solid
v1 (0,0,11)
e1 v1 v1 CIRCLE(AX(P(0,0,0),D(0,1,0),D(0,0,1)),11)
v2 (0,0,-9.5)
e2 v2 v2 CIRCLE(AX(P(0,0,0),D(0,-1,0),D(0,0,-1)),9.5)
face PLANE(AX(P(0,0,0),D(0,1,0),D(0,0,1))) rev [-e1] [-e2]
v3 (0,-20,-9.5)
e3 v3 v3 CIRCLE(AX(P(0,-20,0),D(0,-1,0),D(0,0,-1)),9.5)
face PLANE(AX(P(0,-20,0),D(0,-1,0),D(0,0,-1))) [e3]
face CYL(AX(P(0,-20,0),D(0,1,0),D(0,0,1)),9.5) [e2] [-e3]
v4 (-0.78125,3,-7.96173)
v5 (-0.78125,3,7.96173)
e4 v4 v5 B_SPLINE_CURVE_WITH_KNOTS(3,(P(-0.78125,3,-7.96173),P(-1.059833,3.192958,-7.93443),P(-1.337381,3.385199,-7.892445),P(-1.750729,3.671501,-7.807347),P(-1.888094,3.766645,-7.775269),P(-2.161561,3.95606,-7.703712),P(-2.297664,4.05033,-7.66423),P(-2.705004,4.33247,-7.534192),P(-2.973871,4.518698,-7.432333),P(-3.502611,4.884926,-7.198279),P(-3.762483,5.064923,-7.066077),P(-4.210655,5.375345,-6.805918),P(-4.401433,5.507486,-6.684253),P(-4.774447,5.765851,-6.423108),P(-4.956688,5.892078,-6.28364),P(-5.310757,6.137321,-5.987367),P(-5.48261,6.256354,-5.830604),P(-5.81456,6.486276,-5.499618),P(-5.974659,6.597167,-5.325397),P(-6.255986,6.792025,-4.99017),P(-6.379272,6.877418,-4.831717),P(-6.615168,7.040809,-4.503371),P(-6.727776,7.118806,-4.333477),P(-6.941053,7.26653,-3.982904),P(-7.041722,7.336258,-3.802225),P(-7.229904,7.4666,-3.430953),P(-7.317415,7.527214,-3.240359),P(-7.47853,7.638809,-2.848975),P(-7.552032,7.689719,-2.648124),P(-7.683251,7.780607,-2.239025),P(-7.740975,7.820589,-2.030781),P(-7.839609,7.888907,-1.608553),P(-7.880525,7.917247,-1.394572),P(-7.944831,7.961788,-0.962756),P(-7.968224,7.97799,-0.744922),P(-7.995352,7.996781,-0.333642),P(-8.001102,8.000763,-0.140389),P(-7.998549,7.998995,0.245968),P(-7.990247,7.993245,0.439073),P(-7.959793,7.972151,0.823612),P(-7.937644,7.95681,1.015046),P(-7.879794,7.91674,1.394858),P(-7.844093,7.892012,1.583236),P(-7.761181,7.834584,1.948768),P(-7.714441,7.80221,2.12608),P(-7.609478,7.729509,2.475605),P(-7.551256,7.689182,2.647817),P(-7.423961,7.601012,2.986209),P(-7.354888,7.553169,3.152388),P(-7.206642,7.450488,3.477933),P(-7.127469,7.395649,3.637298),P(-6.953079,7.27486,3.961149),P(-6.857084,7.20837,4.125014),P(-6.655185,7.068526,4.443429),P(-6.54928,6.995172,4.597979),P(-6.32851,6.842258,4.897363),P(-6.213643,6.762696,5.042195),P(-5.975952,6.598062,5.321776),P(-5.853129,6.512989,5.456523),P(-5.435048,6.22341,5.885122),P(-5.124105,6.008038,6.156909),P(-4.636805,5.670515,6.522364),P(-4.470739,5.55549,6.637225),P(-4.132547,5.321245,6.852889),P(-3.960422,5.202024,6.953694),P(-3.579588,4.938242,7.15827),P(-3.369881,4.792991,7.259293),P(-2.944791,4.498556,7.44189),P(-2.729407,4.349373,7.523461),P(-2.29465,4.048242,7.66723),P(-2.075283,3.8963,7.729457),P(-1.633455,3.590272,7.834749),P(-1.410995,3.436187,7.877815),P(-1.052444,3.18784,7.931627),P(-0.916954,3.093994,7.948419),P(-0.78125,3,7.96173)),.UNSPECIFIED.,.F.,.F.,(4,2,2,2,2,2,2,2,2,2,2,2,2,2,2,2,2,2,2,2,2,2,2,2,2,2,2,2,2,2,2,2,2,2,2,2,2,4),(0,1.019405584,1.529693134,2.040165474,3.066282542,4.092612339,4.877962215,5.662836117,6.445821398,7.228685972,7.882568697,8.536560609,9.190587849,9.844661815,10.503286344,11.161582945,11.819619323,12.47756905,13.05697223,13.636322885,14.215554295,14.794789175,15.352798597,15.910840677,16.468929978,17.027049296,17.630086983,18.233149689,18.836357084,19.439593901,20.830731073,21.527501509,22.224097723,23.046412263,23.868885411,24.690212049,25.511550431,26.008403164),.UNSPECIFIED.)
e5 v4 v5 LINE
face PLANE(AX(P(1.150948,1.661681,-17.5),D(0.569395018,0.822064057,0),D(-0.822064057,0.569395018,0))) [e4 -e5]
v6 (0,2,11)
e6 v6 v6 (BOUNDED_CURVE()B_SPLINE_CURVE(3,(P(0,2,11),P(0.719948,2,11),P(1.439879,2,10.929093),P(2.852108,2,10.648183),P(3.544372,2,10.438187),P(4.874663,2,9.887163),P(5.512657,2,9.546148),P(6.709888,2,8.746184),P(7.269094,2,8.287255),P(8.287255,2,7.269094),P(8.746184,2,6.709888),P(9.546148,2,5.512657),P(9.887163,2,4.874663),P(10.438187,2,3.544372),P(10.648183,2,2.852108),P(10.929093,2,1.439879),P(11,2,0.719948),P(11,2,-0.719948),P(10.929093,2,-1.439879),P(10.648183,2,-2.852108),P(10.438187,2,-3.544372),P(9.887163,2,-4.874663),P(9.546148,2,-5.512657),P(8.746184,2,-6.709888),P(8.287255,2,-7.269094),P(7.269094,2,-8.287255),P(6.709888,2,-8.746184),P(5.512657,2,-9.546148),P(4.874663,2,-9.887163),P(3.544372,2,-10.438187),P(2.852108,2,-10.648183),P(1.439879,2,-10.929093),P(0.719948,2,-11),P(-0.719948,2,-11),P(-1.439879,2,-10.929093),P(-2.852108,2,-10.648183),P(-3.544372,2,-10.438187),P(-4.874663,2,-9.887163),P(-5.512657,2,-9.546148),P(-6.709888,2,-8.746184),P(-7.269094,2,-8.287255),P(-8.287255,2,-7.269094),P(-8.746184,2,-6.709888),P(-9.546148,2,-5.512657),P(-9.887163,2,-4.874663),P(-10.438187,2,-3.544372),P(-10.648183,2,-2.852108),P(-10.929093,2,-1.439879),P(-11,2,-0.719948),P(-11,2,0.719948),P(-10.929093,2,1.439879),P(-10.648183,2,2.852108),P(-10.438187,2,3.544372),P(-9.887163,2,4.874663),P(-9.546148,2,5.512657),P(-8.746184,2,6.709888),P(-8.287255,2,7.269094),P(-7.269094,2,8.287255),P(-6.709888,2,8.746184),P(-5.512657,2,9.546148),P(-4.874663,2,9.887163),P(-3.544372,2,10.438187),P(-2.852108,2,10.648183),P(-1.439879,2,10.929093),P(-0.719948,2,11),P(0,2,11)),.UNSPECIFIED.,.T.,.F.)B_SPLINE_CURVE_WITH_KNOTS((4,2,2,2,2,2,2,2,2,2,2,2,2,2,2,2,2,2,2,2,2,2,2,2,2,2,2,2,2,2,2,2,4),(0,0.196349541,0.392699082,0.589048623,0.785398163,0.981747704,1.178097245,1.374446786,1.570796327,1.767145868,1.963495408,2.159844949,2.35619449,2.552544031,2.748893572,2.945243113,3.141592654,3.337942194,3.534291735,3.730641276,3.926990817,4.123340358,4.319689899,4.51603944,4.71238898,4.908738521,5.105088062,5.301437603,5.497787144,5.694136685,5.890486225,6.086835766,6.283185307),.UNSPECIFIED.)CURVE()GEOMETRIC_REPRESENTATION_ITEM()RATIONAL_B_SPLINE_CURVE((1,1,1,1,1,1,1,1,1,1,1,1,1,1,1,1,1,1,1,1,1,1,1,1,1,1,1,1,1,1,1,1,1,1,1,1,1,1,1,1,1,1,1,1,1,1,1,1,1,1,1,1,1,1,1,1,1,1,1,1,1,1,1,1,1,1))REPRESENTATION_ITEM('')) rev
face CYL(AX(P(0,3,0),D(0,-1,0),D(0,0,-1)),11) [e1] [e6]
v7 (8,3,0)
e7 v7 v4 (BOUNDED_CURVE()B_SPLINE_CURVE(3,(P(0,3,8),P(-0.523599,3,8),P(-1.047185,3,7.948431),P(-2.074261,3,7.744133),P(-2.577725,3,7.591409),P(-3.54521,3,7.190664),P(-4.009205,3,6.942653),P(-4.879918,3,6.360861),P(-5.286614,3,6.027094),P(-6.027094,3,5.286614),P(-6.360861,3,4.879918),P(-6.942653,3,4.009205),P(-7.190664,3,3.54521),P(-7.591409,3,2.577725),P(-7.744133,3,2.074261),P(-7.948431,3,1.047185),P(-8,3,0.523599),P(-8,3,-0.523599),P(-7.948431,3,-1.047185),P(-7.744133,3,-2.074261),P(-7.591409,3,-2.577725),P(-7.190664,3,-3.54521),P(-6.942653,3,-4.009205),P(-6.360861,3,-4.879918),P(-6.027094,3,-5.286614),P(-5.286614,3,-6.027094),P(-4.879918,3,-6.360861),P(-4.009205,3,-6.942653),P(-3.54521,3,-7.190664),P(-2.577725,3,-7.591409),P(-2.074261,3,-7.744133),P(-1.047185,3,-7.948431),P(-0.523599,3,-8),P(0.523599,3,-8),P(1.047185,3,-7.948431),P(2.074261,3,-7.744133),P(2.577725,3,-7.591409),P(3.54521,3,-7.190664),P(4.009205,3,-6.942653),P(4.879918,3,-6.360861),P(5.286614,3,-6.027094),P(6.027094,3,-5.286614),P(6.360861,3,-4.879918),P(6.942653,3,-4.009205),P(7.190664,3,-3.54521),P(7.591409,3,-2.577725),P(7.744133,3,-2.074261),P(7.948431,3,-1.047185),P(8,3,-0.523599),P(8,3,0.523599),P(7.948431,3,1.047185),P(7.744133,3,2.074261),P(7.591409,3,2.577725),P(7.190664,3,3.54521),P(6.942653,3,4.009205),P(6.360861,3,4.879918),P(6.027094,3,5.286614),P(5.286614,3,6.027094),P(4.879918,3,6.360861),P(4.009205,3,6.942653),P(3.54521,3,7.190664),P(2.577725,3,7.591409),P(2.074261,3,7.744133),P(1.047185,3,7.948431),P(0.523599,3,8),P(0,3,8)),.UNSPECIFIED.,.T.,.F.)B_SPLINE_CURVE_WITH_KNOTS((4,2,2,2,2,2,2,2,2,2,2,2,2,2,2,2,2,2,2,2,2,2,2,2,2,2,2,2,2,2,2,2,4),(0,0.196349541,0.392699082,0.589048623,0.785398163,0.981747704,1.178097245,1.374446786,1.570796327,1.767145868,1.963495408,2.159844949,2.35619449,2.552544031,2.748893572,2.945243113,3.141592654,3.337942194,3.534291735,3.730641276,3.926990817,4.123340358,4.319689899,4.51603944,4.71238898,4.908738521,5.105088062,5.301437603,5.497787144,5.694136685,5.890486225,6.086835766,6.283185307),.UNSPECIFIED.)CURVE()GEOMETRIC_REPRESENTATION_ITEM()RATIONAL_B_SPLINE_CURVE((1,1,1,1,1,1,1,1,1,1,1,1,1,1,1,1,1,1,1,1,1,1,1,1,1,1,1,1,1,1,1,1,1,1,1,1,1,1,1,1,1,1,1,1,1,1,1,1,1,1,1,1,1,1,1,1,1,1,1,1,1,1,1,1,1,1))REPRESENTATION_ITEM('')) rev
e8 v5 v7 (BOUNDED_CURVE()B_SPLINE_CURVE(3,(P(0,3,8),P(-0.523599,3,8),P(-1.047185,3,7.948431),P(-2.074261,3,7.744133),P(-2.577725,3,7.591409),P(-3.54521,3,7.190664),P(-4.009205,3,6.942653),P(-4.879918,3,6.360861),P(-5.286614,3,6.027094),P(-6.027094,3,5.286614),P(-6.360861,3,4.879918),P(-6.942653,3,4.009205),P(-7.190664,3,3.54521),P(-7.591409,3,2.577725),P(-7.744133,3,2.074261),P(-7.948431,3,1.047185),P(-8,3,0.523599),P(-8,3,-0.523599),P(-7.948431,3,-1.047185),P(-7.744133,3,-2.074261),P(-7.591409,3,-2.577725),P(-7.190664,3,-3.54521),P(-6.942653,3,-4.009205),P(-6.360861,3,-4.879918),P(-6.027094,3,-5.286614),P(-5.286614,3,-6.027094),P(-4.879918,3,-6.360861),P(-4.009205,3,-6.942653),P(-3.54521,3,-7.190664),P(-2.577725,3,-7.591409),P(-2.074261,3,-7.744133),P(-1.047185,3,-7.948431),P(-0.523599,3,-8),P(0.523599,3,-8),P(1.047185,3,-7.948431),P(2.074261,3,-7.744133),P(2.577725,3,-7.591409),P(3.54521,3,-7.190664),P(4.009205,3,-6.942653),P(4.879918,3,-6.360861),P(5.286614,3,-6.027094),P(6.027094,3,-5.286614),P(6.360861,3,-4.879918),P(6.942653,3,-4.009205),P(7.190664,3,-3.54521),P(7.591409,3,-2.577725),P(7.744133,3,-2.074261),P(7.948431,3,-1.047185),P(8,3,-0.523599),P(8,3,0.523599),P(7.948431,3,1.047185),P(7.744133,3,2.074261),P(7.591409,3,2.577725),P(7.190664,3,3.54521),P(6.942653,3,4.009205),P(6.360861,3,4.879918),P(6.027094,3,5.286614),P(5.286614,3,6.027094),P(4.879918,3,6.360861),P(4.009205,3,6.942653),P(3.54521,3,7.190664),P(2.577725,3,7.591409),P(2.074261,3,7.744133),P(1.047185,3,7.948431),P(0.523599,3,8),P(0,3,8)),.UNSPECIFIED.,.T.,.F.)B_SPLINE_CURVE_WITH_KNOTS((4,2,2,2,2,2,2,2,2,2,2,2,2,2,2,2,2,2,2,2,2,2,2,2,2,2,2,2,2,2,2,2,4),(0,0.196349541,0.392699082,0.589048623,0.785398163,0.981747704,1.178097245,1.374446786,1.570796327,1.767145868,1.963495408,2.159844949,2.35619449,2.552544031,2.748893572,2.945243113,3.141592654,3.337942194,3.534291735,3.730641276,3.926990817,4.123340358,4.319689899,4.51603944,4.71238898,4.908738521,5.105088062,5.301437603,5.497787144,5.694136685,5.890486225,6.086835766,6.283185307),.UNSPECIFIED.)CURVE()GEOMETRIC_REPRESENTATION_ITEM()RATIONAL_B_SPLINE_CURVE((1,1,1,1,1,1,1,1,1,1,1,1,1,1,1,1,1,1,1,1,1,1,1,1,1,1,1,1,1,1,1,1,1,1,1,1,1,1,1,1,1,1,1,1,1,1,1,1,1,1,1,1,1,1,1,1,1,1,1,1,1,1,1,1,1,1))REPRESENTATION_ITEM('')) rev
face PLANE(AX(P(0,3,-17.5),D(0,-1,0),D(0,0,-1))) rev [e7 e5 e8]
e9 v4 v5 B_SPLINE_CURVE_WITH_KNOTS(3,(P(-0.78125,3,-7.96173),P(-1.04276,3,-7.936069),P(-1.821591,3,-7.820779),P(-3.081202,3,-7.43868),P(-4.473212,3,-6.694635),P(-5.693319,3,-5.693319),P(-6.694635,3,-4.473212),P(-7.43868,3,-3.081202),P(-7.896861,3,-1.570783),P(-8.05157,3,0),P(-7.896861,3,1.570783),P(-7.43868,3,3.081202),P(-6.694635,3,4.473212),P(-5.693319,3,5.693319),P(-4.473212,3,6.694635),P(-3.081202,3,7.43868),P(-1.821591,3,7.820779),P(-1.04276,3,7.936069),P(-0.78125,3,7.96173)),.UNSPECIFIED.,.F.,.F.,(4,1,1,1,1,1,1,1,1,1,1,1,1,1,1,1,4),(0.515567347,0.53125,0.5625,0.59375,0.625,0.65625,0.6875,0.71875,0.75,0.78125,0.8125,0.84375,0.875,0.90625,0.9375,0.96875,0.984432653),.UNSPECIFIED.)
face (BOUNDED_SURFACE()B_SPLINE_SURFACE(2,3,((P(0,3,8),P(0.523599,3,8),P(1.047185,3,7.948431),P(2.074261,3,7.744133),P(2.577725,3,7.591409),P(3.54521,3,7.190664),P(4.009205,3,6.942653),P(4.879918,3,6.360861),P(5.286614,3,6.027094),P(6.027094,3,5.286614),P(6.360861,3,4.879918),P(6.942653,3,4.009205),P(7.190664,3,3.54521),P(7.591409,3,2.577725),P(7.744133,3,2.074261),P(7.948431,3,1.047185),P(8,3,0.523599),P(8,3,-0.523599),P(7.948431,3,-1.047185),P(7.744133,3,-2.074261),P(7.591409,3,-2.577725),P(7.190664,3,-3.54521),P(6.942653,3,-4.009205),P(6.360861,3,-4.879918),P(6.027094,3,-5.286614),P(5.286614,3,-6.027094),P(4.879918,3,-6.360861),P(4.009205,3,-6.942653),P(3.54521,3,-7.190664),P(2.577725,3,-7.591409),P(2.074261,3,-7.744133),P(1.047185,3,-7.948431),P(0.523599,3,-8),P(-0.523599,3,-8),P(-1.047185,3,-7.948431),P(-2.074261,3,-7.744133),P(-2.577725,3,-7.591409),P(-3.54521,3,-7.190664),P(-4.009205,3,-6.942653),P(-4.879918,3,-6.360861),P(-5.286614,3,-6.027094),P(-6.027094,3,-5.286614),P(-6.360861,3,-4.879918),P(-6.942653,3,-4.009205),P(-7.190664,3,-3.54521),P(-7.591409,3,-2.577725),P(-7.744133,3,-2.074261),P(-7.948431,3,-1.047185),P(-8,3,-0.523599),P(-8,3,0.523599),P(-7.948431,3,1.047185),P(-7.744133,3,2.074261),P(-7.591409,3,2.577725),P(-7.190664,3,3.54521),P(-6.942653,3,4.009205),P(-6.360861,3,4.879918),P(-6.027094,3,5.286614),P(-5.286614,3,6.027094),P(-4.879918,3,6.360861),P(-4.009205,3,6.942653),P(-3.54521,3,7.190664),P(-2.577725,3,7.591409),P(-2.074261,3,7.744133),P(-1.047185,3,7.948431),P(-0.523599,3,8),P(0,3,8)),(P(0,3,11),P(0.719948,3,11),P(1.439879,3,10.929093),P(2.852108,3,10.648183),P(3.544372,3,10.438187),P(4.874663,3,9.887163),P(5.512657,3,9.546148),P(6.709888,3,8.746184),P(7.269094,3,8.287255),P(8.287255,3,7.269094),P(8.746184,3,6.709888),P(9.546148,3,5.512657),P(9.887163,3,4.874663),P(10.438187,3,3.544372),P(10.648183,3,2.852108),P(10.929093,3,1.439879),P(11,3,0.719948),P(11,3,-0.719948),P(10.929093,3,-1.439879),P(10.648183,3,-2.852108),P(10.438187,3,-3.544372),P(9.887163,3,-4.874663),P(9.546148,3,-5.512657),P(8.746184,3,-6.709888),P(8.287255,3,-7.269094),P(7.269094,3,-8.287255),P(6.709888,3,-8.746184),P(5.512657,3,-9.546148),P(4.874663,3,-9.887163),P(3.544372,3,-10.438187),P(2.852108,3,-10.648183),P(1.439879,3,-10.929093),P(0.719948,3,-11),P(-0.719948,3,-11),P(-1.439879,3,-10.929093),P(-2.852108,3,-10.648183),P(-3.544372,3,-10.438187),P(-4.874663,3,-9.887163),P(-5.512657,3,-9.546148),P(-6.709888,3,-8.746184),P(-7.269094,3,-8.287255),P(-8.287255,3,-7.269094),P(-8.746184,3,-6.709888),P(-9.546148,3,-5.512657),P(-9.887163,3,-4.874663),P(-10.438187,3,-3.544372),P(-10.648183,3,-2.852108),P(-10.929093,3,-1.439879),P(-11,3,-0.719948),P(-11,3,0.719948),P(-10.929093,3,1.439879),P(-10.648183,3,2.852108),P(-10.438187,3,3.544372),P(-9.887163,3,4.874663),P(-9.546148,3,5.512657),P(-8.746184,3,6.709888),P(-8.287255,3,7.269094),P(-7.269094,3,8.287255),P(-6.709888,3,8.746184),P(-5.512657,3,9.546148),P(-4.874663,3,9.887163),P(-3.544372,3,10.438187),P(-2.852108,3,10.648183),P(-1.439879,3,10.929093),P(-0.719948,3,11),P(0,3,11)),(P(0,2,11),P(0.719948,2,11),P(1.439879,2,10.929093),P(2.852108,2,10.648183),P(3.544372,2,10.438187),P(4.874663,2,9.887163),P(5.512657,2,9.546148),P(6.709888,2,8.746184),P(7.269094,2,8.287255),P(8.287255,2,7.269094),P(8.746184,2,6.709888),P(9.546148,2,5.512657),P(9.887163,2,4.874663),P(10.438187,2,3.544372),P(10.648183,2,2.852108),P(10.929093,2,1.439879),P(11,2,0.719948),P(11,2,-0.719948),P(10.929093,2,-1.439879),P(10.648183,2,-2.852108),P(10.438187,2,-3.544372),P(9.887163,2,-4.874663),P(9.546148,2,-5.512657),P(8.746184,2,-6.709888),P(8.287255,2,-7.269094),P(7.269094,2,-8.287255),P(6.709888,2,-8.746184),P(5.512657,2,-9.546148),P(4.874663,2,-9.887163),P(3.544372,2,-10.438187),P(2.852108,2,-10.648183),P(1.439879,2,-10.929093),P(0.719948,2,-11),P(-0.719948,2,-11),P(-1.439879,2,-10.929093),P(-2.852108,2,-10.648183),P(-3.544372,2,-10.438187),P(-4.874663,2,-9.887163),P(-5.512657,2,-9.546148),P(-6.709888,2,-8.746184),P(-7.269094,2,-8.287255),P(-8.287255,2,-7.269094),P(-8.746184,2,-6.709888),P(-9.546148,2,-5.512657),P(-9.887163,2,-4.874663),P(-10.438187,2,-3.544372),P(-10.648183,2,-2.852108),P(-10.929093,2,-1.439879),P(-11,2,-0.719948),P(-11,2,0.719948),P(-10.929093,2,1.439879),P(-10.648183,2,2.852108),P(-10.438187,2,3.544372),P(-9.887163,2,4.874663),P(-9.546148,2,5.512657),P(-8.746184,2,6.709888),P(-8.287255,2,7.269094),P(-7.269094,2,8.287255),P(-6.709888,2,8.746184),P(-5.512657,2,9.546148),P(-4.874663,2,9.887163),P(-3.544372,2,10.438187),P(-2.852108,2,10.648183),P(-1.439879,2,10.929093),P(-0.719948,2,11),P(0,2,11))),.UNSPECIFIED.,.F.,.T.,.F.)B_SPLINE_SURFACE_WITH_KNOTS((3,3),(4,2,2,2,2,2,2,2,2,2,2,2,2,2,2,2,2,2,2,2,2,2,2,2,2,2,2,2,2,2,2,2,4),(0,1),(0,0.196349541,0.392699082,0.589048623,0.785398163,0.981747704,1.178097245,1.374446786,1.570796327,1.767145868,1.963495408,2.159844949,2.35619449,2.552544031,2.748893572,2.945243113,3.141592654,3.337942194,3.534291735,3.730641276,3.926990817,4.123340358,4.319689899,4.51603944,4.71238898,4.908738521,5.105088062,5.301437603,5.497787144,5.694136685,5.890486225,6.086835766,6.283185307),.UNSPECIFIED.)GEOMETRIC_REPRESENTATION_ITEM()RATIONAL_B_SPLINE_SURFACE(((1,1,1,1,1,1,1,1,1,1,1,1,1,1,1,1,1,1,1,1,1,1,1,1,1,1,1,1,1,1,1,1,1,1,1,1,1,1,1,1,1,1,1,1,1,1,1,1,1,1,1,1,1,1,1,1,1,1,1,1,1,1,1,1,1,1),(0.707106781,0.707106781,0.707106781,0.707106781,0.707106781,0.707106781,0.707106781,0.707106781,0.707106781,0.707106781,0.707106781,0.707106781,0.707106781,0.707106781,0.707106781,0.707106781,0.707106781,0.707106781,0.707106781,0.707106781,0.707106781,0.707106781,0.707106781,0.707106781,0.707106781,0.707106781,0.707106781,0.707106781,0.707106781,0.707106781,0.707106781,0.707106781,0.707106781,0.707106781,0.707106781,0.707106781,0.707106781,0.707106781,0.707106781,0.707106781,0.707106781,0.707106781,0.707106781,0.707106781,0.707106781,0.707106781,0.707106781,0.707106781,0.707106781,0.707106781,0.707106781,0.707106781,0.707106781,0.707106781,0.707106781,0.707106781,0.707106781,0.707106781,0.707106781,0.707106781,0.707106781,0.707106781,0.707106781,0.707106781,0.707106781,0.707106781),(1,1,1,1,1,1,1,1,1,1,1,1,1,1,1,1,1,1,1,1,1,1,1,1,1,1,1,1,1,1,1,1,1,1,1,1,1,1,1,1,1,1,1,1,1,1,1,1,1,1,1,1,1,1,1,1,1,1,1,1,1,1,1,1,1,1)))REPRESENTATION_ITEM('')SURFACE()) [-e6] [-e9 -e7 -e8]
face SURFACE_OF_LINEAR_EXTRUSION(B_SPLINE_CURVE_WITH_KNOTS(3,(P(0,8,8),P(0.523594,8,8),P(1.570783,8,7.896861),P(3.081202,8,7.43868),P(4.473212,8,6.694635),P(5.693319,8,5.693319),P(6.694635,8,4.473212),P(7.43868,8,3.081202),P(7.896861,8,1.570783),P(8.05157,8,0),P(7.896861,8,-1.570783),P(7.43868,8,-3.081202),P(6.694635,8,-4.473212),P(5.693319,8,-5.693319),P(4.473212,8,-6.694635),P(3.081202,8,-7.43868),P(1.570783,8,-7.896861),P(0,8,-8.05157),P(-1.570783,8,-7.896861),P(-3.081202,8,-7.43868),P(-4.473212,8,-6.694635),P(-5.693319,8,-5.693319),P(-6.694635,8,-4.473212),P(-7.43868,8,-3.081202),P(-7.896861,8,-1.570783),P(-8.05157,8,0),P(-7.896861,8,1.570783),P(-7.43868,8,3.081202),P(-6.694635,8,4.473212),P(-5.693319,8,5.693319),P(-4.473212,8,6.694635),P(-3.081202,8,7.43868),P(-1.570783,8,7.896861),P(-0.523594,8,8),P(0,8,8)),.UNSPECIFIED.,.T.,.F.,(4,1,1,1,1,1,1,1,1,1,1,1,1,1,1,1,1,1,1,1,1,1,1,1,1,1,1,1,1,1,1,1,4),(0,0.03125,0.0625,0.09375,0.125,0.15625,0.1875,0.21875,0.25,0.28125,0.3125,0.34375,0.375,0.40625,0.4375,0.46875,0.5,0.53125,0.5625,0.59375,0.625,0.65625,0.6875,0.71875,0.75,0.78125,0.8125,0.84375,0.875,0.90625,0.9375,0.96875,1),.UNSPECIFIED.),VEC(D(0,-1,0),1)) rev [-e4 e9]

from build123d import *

# Parameters (mm, degrees)
SKETCH1_R           = 11
BOSS_EXTRUDE1_DEPTH = 3
SKETCH2_R           = 9.5
BOSS_EXTRUDE2_DEPTH = 20
FILLET1_SIZE        = 1
FILLET1_SIZE_2      = 3
BOSS_EXTRUDE3_DEPTH = 5
CUT_EXTRUDE1_DEPTH  = 17.5


with BuildPart() as part:
    # Sketch1 → Boss-Extrude1 (new body)
    with BuildSketch(Plane(origin=(0, 0, 0), x_dir=(1, 0, 0), z_dir=(0, 1, 0))):
        with Locations(Location((0, 0, 0), (0, 0, 270))):
            Circle(SKETCH1_R)
    extrude(amount=BOSS_EXTRUDE1_DEPTH)

    # Sketch2 → Boss-Extrude2 (add)
    with BuildSketch(Plane.XZ):
        with Locations(Location((0, 0, 0), (0, 0, 270))):
            Circle(SKETCH2_R)
    extrude(amount=BOSS_EXTRUDE2_DEPTH)

    # Fillet1
    # an asymmetric fillet: 3, 1 mm, written as the material it takes off along each edge
    with BuildSketch(Plane(origin=(0, 3, 0), x_dir=(0, 0, 1), z_dir=(-1, 0, 0))) as fillet1_piece_1:
        with BuildLine():
            Bezier((11, -FILLET1_SIZE), (11, 0), (11 - FILLET1_SIZE_2, 0), weights=[1, 0.707106781, 1])
            Line((11 - FILLET1_SIZE_2, 0), (11, 0))
            Line((11, 0), (11, -FILLET1_SIZE))
        make_face()
    revolve(axis=Axis((0, 3, 0), (0, 1, 0)), mode=Mode.SUBTRACT)

    # Sketch4 → Boss-Extrude3 (add)
    with BuildSketch(Plane(origin=(0, 3, 0), x_dir=(1, 0, 0), z_dir=(0, 1, 0))):
        with BuildLine():
            add(Edge.make_bspline(
                [(0, -8), (0.523594432, -8), (1.570783296, -7.896860899), (3.081202271, -7.438680312), (4.473212371, -6.694635413), (5.693319428, -5.693319428), (6.694635413, -4.473212371), (7.438680312, -3.081202271), (7.896860899, -1.570783296), (8.05156955, 0), (7.896860899, 1.570783296), (7.438680312, 3.081202271), (6.694635413, 4.473212371), (5.693319428, 5.693319428), (4.473212371, 6.694635413), (3.081202271, 7.438680312), (1.570783296, 7.896860899), (0, 8.05156955), (-1.570783296, 7.896860899), (-3.081202271, 7.438680312), (-4.473212371, 6.694635413), (-5.693319428, 5.693319428), (-6.694635413, 4.473212371), (-7.438680312, 3.081202271), (-7.896860899, 1.570783296), (-8.05156955, 0), (-7.896860899, -1.570783296), (-7.438680312, -3.081202271), (-6.694635413, -4.473212371), (-5.693319428, -5.693319428), (-4.473212371, -6.694635413), (-3.081202271, -7.438680312), (-1.570783296, -7.896860899), (-0.523594432, -8), (0, -8)],
                knots=[0, 0, 0, 0, 0.03125, 0.0625, 0.09375, 0.125, 0.15625, 0.1875, 0.21875, 0.25, 0.28125, 0.3125, 0.34375, 0.375, 0.40625, 0.4375, 0.46875, 0.5, 0.53125, 0.5625, 0.59375, 0.625, 0.65625, 0.6875, 0.71875, 0.75, 0.78125, 0.8125, 0.84375, 0.875, 0.90625, 0.9375, 0.96875, 1, 1, 1, 1], degree=3))
        make_face()
    extrude(amount=BOSS_EXTRUDE3_DEPTH)

    # Sketch5 → Cut-Extrude1 (cut, symmetric)
    with BuildSketch(Plane.XY):
        Polygon((-8, 8), (-0.78125, 3), (8, 3), (8, 8), align=None)
    extrude(amount=CUT_EXTRUDE1_DEPTH, both=True, mode=Mode.SUBTRACT)


solid = part.part
